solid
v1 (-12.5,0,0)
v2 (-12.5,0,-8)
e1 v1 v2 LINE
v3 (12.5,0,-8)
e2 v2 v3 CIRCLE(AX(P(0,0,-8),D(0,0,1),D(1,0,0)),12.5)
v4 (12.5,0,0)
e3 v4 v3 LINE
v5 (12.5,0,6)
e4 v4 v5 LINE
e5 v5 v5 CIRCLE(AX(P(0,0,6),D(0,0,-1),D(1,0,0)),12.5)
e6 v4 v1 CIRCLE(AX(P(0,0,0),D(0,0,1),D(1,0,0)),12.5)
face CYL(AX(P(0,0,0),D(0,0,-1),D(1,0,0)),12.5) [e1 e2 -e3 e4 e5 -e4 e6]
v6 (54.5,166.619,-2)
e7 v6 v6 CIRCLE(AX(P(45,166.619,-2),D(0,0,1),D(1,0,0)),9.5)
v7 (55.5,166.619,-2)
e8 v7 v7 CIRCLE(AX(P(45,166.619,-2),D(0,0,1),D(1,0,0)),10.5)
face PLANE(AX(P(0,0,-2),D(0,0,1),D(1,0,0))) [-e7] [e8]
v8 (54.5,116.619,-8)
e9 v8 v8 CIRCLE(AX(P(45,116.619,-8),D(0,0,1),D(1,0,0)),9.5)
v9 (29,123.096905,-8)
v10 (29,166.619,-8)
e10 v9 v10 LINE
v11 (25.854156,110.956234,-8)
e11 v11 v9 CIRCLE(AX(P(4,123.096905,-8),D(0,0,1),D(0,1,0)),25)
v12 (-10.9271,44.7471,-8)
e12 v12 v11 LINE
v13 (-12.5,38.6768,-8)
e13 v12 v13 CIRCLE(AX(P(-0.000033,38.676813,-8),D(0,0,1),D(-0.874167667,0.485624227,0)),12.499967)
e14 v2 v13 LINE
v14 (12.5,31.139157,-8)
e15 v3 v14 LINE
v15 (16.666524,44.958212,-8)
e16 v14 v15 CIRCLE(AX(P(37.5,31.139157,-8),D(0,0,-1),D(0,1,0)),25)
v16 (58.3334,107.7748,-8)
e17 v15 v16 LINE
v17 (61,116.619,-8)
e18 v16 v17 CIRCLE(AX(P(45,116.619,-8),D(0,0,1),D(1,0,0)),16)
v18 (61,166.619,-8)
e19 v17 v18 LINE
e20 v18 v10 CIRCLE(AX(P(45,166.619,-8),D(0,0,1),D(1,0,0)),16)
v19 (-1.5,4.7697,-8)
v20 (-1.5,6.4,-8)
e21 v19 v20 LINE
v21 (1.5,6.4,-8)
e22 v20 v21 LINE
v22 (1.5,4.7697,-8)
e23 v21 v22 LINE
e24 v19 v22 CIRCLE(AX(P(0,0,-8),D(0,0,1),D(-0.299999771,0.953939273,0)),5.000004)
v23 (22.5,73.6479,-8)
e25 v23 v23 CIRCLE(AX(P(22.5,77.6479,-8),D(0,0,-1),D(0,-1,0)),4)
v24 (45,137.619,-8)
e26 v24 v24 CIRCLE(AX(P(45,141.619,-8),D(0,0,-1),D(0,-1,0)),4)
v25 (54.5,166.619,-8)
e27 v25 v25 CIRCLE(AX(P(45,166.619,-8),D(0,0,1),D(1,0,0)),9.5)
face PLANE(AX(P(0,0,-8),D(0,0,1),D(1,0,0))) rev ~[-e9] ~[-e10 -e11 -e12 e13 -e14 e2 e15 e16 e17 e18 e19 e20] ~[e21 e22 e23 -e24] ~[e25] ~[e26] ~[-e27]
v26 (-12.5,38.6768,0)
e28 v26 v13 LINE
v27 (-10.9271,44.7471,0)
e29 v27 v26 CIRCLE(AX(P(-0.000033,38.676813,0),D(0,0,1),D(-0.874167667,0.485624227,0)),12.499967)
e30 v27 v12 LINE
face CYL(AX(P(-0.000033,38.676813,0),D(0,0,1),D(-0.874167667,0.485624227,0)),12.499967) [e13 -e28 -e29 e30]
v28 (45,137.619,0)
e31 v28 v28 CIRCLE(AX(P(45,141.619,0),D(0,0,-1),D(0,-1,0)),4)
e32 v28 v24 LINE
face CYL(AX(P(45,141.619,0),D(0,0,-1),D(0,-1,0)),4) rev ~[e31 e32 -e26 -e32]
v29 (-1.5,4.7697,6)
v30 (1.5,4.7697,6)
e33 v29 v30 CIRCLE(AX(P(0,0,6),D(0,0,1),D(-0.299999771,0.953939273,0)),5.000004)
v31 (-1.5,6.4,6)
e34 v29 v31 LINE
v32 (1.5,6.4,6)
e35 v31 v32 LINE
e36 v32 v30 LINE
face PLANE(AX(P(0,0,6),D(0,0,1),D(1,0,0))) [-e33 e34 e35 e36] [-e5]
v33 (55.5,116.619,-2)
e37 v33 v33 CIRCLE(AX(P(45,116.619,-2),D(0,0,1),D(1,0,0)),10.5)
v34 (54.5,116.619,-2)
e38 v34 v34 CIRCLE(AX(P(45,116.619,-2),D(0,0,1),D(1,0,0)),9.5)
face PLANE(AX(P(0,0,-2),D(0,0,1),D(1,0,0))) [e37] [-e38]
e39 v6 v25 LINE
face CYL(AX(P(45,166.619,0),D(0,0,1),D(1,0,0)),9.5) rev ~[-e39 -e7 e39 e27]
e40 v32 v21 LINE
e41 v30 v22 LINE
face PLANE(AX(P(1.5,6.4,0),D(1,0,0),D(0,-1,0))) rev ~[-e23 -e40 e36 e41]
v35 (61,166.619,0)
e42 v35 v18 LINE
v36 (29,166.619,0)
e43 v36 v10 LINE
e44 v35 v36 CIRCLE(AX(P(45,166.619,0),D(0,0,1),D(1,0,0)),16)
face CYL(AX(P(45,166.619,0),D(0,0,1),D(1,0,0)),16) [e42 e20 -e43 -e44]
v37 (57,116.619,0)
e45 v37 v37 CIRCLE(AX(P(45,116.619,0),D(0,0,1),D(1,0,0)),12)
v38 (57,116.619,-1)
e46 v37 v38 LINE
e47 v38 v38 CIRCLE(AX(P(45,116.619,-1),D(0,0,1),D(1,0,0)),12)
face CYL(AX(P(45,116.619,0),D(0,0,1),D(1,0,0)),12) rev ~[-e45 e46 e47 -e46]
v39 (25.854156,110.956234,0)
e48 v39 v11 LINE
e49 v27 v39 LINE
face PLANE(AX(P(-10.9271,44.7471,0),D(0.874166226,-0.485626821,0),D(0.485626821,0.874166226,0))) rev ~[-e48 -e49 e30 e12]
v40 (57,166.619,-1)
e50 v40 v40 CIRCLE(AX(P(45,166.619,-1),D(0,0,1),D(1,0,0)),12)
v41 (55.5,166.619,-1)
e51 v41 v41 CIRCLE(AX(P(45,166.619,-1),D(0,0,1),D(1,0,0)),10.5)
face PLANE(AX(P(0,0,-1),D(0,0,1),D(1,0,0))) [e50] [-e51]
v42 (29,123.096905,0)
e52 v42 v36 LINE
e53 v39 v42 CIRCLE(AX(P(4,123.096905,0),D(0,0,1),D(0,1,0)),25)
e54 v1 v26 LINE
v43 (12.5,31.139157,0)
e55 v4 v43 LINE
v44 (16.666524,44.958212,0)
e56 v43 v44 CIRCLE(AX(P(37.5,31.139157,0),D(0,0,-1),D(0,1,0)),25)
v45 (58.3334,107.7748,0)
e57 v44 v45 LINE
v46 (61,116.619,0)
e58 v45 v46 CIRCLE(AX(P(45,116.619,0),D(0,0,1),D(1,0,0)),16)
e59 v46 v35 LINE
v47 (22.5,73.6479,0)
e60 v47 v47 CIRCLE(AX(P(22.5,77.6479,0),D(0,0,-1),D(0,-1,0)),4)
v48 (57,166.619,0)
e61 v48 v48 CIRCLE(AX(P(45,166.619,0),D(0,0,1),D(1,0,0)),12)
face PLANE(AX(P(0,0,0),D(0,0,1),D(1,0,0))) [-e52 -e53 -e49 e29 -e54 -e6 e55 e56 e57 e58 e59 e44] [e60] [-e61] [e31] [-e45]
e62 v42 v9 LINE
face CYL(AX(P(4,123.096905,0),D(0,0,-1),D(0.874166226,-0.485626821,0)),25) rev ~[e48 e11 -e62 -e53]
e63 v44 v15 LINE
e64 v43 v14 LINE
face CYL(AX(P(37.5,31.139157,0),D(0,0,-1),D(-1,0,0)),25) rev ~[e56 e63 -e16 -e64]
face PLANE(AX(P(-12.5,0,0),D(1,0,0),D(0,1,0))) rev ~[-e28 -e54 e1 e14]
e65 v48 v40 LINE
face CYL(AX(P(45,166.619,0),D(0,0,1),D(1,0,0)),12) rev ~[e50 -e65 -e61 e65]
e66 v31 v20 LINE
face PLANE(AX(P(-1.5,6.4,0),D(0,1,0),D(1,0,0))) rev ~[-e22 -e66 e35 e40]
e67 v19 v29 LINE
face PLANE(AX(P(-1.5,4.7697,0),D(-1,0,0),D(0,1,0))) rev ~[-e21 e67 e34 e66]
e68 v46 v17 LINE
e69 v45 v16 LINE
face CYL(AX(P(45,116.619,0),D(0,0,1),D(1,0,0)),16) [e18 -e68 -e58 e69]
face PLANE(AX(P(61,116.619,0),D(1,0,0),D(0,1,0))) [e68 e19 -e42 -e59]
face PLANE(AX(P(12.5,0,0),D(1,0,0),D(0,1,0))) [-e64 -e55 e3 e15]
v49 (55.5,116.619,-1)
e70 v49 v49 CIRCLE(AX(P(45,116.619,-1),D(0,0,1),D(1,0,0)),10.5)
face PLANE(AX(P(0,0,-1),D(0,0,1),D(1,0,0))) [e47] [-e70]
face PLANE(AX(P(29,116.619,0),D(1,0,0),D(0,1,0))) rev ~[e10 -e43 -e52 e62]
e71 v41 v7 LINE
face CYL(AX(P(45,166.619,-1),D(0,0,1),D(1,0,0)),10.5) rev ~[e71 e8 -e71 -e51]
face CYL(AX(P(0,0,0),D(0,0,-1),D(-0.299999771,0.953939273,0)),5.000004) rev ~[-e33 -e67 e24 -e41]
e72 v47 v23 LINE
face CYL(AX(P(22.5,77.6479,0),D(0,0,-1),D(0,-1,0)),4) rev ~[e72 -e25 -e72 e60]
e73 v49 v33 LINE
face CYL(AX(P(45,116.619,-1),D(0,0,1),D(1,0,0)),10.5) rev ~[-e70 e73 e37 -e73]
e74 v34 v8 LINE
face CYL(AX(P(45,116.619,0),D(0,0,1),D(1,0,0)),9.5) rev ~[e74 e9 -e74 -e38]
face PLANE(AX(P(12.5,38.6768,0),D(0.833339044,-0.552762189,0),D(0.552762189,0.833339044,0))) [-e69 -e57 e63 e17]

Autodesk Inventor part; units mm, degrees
ref_plane "YZ Plane" through (0, 0, 0) normal (1, 0, 0) x (0, 1, 0)
ref_plane "XZ Plane" through (0, 0, 0) normal (0, 1, 0) x (-1, 0, 0)
sketch "Skizze1" plane through (0, 0, 0) normal (0, 0, 1) x (1, 0, 0)
  arc A0 (-1.5, 4.7697) -> (1.5, 4.7697) centre (0, 0) ccw
  circle A1 centre (0, 0) radius 12.5
  line L0 (-30.9429, 0) -> (77.0229, 0) construction
  circle A2 centre (0, 0) radius 12.5
  circle A3 centre (45, 116.619) radius 16
  line L1 (61, 116.619) -> (61, 166.619)
  line L2 (29, 116.619) -> (29, 166.619)
  line L3 (45, 116.619) -> (45, 182.619) construction
  line L4 (45, 116.619) -> (45, 132.619) construction
  line L5 (29, 116.619) -> (61, 116.619) construction
  line L6 (-12.5, 0) -> (-12.5, 38.6768)
  line L7 (12.5, 0) -> (12.5, 38.6768)
  line L8 (-12.5, 38.6768) -> (12.5, 38.6768) construction
  circle A4 centre (0, 38.6768) radius 12.5 construction
  line L9 (-10.9271, 44.7471) -> (29, 116.619)
  arc A5 (-10.9271, 44.7471) -> (-12.5, 38.6768) centre (0, 38.6768) ccw
  line L10 (12.5, 38.6768) -> (58.3334, 107.7748)
  arc A6 (58.3334, 107.7748) -> (61, 116.619) centre (45, 116.619) ccw
  line L11 (0, 38.6768) -> (45, 116.619) construction
  circle A7 centre (45, 166.619) radius 16
  circle A8 centre (45, 166.619) radius 9.5
  circle A9 centre (45, 116.619) radius 9.5
  line L12 (-1.5, 6.4) -> (1.5, 6.4)
  line L13 (1.5, 6.4) -> (1.5, 4.7697)
  line L14 (-1.5, 4.7697) -> (-1.5, 6.4)
  line L15 (0, 0) -> (0, 5) construction
  line L16 (0, 5) -> (1.5, 5) construction
  circle A10 centre (45, 116.619) radius 12.75 construction
  circle A11 centre (45, 166.619) radius 12.75 construction
  circle A12 centre (45, 116.619) radius 10.5
  circle A13 centre (45, 166.619) radius 10.5
  circle A14 centre (45, 116.619) radius 12
  circle A15 centre (45, 166.619) radius 12
  point P0 (22.5, 77.6479)
  point P1 (45, 141.619)
  point P2 (0, 6.4)
  point P3 (45, 129.369)
  point P4 (33.9582, 110.244)
  point P5 (56.0418, 110.244)
  point P6 (45, 179.369)
  point P7 (33.9582, 160.244)
  point P8 (56.0418, 160.244)
  dimension "d69" = 25.5
  dimension "ParallelHebel_Passflansch_HoleDia" = 25.5
  dimension "d0" = 10
  dimension "d1" = 25
  dimension "d4" = 25
  dimension "d36" = 0
  dimension "ParallelHebel_Gabelgelenk_OuterDia" = 32
  dimension "d38" = 60
  dimension "d40" = 90
  dimension "d41" = 50
  dimension "d42" = 45
  dimension "d43" = 19
  dimension "Nadellager_OuterDia" = 19
  dimension "d45" = 25
  dimension "d51" = 3
  dimension "d52" = 1.4
  dimension "d67" = 360
  dimension "d72" = 360
  dimension "d83" = 21
  dimension "d84" = 24
  dimension "d85" = 21
  dimension "d86" = 24
  dimension "d91" = 125
extrude "Extrusion1" add sketch "Skizze1" along normal blind 6 contours A1
extrude "Extrusion2" add sketch "Skizze1" against normal blind 8 contours A1 | A1 L6 A5 L9 A3 L10 L7 | A3 | L2 A7 L1 A3 | A7 | A12 | A13 | A14 | A15
fillet "Rundung1" radius 25 2 edges at (29, 116.619, -4) (12.5, 38.6768, -4)
hole "Bohrung2" at (45, 141.619, 0) at (22.5, 77.6479, 0) direction (0, 0, -1) diameter 8 end through all
ref_plane "Arbeitsebene1" through (45, 116.619, 0) normal (1, 0, 0) x (0, 0, -1)
extrude "Extrusion5" cut sketch "Skizze1" against normal blind 1 contours A12 | A13 | A14 | A15
extrude "Extrusion6" cut sketch "Skizze1" against normal blind 1 from surface at -1 contours A12 | A13
equation "\"d1_1\" = 25"
equation "\"d8_1\" = 0"
equation "\"d10_1\" = 0"
equation "\"d11_1\" = 25"
equation "\"d23_1\" = 8"
equation "\"d36_1\" = 0"
equation "\"d38_1\" = 60deg"
equation "\"d39_1\" = 35"
equation "\"ParallelLink_Lever_Thickness_1\" = 14"
equation "\"ParallelHebel_Gabelgelenk_OuterDia_1\" = 32"
equation "\"Nadellager_OuterDia_1\" = 19"
equation "\"ParallelHebel_Passflansch_HoleDia_1\" = 25.5"
equation "\"d1_1_2_3\" = 25"
equation "\"ParallelMecha_Bearing_Step_Thickness\" = 6"
equation "\"d8_1_2_3\" = 0"
equation "\"d39_1_2\" = 35"
properties part number "ParallelSystem_ProximalPart_Driven_Counterpart_v2.1_Rillenkugellager" material "Aluminium 6061"
